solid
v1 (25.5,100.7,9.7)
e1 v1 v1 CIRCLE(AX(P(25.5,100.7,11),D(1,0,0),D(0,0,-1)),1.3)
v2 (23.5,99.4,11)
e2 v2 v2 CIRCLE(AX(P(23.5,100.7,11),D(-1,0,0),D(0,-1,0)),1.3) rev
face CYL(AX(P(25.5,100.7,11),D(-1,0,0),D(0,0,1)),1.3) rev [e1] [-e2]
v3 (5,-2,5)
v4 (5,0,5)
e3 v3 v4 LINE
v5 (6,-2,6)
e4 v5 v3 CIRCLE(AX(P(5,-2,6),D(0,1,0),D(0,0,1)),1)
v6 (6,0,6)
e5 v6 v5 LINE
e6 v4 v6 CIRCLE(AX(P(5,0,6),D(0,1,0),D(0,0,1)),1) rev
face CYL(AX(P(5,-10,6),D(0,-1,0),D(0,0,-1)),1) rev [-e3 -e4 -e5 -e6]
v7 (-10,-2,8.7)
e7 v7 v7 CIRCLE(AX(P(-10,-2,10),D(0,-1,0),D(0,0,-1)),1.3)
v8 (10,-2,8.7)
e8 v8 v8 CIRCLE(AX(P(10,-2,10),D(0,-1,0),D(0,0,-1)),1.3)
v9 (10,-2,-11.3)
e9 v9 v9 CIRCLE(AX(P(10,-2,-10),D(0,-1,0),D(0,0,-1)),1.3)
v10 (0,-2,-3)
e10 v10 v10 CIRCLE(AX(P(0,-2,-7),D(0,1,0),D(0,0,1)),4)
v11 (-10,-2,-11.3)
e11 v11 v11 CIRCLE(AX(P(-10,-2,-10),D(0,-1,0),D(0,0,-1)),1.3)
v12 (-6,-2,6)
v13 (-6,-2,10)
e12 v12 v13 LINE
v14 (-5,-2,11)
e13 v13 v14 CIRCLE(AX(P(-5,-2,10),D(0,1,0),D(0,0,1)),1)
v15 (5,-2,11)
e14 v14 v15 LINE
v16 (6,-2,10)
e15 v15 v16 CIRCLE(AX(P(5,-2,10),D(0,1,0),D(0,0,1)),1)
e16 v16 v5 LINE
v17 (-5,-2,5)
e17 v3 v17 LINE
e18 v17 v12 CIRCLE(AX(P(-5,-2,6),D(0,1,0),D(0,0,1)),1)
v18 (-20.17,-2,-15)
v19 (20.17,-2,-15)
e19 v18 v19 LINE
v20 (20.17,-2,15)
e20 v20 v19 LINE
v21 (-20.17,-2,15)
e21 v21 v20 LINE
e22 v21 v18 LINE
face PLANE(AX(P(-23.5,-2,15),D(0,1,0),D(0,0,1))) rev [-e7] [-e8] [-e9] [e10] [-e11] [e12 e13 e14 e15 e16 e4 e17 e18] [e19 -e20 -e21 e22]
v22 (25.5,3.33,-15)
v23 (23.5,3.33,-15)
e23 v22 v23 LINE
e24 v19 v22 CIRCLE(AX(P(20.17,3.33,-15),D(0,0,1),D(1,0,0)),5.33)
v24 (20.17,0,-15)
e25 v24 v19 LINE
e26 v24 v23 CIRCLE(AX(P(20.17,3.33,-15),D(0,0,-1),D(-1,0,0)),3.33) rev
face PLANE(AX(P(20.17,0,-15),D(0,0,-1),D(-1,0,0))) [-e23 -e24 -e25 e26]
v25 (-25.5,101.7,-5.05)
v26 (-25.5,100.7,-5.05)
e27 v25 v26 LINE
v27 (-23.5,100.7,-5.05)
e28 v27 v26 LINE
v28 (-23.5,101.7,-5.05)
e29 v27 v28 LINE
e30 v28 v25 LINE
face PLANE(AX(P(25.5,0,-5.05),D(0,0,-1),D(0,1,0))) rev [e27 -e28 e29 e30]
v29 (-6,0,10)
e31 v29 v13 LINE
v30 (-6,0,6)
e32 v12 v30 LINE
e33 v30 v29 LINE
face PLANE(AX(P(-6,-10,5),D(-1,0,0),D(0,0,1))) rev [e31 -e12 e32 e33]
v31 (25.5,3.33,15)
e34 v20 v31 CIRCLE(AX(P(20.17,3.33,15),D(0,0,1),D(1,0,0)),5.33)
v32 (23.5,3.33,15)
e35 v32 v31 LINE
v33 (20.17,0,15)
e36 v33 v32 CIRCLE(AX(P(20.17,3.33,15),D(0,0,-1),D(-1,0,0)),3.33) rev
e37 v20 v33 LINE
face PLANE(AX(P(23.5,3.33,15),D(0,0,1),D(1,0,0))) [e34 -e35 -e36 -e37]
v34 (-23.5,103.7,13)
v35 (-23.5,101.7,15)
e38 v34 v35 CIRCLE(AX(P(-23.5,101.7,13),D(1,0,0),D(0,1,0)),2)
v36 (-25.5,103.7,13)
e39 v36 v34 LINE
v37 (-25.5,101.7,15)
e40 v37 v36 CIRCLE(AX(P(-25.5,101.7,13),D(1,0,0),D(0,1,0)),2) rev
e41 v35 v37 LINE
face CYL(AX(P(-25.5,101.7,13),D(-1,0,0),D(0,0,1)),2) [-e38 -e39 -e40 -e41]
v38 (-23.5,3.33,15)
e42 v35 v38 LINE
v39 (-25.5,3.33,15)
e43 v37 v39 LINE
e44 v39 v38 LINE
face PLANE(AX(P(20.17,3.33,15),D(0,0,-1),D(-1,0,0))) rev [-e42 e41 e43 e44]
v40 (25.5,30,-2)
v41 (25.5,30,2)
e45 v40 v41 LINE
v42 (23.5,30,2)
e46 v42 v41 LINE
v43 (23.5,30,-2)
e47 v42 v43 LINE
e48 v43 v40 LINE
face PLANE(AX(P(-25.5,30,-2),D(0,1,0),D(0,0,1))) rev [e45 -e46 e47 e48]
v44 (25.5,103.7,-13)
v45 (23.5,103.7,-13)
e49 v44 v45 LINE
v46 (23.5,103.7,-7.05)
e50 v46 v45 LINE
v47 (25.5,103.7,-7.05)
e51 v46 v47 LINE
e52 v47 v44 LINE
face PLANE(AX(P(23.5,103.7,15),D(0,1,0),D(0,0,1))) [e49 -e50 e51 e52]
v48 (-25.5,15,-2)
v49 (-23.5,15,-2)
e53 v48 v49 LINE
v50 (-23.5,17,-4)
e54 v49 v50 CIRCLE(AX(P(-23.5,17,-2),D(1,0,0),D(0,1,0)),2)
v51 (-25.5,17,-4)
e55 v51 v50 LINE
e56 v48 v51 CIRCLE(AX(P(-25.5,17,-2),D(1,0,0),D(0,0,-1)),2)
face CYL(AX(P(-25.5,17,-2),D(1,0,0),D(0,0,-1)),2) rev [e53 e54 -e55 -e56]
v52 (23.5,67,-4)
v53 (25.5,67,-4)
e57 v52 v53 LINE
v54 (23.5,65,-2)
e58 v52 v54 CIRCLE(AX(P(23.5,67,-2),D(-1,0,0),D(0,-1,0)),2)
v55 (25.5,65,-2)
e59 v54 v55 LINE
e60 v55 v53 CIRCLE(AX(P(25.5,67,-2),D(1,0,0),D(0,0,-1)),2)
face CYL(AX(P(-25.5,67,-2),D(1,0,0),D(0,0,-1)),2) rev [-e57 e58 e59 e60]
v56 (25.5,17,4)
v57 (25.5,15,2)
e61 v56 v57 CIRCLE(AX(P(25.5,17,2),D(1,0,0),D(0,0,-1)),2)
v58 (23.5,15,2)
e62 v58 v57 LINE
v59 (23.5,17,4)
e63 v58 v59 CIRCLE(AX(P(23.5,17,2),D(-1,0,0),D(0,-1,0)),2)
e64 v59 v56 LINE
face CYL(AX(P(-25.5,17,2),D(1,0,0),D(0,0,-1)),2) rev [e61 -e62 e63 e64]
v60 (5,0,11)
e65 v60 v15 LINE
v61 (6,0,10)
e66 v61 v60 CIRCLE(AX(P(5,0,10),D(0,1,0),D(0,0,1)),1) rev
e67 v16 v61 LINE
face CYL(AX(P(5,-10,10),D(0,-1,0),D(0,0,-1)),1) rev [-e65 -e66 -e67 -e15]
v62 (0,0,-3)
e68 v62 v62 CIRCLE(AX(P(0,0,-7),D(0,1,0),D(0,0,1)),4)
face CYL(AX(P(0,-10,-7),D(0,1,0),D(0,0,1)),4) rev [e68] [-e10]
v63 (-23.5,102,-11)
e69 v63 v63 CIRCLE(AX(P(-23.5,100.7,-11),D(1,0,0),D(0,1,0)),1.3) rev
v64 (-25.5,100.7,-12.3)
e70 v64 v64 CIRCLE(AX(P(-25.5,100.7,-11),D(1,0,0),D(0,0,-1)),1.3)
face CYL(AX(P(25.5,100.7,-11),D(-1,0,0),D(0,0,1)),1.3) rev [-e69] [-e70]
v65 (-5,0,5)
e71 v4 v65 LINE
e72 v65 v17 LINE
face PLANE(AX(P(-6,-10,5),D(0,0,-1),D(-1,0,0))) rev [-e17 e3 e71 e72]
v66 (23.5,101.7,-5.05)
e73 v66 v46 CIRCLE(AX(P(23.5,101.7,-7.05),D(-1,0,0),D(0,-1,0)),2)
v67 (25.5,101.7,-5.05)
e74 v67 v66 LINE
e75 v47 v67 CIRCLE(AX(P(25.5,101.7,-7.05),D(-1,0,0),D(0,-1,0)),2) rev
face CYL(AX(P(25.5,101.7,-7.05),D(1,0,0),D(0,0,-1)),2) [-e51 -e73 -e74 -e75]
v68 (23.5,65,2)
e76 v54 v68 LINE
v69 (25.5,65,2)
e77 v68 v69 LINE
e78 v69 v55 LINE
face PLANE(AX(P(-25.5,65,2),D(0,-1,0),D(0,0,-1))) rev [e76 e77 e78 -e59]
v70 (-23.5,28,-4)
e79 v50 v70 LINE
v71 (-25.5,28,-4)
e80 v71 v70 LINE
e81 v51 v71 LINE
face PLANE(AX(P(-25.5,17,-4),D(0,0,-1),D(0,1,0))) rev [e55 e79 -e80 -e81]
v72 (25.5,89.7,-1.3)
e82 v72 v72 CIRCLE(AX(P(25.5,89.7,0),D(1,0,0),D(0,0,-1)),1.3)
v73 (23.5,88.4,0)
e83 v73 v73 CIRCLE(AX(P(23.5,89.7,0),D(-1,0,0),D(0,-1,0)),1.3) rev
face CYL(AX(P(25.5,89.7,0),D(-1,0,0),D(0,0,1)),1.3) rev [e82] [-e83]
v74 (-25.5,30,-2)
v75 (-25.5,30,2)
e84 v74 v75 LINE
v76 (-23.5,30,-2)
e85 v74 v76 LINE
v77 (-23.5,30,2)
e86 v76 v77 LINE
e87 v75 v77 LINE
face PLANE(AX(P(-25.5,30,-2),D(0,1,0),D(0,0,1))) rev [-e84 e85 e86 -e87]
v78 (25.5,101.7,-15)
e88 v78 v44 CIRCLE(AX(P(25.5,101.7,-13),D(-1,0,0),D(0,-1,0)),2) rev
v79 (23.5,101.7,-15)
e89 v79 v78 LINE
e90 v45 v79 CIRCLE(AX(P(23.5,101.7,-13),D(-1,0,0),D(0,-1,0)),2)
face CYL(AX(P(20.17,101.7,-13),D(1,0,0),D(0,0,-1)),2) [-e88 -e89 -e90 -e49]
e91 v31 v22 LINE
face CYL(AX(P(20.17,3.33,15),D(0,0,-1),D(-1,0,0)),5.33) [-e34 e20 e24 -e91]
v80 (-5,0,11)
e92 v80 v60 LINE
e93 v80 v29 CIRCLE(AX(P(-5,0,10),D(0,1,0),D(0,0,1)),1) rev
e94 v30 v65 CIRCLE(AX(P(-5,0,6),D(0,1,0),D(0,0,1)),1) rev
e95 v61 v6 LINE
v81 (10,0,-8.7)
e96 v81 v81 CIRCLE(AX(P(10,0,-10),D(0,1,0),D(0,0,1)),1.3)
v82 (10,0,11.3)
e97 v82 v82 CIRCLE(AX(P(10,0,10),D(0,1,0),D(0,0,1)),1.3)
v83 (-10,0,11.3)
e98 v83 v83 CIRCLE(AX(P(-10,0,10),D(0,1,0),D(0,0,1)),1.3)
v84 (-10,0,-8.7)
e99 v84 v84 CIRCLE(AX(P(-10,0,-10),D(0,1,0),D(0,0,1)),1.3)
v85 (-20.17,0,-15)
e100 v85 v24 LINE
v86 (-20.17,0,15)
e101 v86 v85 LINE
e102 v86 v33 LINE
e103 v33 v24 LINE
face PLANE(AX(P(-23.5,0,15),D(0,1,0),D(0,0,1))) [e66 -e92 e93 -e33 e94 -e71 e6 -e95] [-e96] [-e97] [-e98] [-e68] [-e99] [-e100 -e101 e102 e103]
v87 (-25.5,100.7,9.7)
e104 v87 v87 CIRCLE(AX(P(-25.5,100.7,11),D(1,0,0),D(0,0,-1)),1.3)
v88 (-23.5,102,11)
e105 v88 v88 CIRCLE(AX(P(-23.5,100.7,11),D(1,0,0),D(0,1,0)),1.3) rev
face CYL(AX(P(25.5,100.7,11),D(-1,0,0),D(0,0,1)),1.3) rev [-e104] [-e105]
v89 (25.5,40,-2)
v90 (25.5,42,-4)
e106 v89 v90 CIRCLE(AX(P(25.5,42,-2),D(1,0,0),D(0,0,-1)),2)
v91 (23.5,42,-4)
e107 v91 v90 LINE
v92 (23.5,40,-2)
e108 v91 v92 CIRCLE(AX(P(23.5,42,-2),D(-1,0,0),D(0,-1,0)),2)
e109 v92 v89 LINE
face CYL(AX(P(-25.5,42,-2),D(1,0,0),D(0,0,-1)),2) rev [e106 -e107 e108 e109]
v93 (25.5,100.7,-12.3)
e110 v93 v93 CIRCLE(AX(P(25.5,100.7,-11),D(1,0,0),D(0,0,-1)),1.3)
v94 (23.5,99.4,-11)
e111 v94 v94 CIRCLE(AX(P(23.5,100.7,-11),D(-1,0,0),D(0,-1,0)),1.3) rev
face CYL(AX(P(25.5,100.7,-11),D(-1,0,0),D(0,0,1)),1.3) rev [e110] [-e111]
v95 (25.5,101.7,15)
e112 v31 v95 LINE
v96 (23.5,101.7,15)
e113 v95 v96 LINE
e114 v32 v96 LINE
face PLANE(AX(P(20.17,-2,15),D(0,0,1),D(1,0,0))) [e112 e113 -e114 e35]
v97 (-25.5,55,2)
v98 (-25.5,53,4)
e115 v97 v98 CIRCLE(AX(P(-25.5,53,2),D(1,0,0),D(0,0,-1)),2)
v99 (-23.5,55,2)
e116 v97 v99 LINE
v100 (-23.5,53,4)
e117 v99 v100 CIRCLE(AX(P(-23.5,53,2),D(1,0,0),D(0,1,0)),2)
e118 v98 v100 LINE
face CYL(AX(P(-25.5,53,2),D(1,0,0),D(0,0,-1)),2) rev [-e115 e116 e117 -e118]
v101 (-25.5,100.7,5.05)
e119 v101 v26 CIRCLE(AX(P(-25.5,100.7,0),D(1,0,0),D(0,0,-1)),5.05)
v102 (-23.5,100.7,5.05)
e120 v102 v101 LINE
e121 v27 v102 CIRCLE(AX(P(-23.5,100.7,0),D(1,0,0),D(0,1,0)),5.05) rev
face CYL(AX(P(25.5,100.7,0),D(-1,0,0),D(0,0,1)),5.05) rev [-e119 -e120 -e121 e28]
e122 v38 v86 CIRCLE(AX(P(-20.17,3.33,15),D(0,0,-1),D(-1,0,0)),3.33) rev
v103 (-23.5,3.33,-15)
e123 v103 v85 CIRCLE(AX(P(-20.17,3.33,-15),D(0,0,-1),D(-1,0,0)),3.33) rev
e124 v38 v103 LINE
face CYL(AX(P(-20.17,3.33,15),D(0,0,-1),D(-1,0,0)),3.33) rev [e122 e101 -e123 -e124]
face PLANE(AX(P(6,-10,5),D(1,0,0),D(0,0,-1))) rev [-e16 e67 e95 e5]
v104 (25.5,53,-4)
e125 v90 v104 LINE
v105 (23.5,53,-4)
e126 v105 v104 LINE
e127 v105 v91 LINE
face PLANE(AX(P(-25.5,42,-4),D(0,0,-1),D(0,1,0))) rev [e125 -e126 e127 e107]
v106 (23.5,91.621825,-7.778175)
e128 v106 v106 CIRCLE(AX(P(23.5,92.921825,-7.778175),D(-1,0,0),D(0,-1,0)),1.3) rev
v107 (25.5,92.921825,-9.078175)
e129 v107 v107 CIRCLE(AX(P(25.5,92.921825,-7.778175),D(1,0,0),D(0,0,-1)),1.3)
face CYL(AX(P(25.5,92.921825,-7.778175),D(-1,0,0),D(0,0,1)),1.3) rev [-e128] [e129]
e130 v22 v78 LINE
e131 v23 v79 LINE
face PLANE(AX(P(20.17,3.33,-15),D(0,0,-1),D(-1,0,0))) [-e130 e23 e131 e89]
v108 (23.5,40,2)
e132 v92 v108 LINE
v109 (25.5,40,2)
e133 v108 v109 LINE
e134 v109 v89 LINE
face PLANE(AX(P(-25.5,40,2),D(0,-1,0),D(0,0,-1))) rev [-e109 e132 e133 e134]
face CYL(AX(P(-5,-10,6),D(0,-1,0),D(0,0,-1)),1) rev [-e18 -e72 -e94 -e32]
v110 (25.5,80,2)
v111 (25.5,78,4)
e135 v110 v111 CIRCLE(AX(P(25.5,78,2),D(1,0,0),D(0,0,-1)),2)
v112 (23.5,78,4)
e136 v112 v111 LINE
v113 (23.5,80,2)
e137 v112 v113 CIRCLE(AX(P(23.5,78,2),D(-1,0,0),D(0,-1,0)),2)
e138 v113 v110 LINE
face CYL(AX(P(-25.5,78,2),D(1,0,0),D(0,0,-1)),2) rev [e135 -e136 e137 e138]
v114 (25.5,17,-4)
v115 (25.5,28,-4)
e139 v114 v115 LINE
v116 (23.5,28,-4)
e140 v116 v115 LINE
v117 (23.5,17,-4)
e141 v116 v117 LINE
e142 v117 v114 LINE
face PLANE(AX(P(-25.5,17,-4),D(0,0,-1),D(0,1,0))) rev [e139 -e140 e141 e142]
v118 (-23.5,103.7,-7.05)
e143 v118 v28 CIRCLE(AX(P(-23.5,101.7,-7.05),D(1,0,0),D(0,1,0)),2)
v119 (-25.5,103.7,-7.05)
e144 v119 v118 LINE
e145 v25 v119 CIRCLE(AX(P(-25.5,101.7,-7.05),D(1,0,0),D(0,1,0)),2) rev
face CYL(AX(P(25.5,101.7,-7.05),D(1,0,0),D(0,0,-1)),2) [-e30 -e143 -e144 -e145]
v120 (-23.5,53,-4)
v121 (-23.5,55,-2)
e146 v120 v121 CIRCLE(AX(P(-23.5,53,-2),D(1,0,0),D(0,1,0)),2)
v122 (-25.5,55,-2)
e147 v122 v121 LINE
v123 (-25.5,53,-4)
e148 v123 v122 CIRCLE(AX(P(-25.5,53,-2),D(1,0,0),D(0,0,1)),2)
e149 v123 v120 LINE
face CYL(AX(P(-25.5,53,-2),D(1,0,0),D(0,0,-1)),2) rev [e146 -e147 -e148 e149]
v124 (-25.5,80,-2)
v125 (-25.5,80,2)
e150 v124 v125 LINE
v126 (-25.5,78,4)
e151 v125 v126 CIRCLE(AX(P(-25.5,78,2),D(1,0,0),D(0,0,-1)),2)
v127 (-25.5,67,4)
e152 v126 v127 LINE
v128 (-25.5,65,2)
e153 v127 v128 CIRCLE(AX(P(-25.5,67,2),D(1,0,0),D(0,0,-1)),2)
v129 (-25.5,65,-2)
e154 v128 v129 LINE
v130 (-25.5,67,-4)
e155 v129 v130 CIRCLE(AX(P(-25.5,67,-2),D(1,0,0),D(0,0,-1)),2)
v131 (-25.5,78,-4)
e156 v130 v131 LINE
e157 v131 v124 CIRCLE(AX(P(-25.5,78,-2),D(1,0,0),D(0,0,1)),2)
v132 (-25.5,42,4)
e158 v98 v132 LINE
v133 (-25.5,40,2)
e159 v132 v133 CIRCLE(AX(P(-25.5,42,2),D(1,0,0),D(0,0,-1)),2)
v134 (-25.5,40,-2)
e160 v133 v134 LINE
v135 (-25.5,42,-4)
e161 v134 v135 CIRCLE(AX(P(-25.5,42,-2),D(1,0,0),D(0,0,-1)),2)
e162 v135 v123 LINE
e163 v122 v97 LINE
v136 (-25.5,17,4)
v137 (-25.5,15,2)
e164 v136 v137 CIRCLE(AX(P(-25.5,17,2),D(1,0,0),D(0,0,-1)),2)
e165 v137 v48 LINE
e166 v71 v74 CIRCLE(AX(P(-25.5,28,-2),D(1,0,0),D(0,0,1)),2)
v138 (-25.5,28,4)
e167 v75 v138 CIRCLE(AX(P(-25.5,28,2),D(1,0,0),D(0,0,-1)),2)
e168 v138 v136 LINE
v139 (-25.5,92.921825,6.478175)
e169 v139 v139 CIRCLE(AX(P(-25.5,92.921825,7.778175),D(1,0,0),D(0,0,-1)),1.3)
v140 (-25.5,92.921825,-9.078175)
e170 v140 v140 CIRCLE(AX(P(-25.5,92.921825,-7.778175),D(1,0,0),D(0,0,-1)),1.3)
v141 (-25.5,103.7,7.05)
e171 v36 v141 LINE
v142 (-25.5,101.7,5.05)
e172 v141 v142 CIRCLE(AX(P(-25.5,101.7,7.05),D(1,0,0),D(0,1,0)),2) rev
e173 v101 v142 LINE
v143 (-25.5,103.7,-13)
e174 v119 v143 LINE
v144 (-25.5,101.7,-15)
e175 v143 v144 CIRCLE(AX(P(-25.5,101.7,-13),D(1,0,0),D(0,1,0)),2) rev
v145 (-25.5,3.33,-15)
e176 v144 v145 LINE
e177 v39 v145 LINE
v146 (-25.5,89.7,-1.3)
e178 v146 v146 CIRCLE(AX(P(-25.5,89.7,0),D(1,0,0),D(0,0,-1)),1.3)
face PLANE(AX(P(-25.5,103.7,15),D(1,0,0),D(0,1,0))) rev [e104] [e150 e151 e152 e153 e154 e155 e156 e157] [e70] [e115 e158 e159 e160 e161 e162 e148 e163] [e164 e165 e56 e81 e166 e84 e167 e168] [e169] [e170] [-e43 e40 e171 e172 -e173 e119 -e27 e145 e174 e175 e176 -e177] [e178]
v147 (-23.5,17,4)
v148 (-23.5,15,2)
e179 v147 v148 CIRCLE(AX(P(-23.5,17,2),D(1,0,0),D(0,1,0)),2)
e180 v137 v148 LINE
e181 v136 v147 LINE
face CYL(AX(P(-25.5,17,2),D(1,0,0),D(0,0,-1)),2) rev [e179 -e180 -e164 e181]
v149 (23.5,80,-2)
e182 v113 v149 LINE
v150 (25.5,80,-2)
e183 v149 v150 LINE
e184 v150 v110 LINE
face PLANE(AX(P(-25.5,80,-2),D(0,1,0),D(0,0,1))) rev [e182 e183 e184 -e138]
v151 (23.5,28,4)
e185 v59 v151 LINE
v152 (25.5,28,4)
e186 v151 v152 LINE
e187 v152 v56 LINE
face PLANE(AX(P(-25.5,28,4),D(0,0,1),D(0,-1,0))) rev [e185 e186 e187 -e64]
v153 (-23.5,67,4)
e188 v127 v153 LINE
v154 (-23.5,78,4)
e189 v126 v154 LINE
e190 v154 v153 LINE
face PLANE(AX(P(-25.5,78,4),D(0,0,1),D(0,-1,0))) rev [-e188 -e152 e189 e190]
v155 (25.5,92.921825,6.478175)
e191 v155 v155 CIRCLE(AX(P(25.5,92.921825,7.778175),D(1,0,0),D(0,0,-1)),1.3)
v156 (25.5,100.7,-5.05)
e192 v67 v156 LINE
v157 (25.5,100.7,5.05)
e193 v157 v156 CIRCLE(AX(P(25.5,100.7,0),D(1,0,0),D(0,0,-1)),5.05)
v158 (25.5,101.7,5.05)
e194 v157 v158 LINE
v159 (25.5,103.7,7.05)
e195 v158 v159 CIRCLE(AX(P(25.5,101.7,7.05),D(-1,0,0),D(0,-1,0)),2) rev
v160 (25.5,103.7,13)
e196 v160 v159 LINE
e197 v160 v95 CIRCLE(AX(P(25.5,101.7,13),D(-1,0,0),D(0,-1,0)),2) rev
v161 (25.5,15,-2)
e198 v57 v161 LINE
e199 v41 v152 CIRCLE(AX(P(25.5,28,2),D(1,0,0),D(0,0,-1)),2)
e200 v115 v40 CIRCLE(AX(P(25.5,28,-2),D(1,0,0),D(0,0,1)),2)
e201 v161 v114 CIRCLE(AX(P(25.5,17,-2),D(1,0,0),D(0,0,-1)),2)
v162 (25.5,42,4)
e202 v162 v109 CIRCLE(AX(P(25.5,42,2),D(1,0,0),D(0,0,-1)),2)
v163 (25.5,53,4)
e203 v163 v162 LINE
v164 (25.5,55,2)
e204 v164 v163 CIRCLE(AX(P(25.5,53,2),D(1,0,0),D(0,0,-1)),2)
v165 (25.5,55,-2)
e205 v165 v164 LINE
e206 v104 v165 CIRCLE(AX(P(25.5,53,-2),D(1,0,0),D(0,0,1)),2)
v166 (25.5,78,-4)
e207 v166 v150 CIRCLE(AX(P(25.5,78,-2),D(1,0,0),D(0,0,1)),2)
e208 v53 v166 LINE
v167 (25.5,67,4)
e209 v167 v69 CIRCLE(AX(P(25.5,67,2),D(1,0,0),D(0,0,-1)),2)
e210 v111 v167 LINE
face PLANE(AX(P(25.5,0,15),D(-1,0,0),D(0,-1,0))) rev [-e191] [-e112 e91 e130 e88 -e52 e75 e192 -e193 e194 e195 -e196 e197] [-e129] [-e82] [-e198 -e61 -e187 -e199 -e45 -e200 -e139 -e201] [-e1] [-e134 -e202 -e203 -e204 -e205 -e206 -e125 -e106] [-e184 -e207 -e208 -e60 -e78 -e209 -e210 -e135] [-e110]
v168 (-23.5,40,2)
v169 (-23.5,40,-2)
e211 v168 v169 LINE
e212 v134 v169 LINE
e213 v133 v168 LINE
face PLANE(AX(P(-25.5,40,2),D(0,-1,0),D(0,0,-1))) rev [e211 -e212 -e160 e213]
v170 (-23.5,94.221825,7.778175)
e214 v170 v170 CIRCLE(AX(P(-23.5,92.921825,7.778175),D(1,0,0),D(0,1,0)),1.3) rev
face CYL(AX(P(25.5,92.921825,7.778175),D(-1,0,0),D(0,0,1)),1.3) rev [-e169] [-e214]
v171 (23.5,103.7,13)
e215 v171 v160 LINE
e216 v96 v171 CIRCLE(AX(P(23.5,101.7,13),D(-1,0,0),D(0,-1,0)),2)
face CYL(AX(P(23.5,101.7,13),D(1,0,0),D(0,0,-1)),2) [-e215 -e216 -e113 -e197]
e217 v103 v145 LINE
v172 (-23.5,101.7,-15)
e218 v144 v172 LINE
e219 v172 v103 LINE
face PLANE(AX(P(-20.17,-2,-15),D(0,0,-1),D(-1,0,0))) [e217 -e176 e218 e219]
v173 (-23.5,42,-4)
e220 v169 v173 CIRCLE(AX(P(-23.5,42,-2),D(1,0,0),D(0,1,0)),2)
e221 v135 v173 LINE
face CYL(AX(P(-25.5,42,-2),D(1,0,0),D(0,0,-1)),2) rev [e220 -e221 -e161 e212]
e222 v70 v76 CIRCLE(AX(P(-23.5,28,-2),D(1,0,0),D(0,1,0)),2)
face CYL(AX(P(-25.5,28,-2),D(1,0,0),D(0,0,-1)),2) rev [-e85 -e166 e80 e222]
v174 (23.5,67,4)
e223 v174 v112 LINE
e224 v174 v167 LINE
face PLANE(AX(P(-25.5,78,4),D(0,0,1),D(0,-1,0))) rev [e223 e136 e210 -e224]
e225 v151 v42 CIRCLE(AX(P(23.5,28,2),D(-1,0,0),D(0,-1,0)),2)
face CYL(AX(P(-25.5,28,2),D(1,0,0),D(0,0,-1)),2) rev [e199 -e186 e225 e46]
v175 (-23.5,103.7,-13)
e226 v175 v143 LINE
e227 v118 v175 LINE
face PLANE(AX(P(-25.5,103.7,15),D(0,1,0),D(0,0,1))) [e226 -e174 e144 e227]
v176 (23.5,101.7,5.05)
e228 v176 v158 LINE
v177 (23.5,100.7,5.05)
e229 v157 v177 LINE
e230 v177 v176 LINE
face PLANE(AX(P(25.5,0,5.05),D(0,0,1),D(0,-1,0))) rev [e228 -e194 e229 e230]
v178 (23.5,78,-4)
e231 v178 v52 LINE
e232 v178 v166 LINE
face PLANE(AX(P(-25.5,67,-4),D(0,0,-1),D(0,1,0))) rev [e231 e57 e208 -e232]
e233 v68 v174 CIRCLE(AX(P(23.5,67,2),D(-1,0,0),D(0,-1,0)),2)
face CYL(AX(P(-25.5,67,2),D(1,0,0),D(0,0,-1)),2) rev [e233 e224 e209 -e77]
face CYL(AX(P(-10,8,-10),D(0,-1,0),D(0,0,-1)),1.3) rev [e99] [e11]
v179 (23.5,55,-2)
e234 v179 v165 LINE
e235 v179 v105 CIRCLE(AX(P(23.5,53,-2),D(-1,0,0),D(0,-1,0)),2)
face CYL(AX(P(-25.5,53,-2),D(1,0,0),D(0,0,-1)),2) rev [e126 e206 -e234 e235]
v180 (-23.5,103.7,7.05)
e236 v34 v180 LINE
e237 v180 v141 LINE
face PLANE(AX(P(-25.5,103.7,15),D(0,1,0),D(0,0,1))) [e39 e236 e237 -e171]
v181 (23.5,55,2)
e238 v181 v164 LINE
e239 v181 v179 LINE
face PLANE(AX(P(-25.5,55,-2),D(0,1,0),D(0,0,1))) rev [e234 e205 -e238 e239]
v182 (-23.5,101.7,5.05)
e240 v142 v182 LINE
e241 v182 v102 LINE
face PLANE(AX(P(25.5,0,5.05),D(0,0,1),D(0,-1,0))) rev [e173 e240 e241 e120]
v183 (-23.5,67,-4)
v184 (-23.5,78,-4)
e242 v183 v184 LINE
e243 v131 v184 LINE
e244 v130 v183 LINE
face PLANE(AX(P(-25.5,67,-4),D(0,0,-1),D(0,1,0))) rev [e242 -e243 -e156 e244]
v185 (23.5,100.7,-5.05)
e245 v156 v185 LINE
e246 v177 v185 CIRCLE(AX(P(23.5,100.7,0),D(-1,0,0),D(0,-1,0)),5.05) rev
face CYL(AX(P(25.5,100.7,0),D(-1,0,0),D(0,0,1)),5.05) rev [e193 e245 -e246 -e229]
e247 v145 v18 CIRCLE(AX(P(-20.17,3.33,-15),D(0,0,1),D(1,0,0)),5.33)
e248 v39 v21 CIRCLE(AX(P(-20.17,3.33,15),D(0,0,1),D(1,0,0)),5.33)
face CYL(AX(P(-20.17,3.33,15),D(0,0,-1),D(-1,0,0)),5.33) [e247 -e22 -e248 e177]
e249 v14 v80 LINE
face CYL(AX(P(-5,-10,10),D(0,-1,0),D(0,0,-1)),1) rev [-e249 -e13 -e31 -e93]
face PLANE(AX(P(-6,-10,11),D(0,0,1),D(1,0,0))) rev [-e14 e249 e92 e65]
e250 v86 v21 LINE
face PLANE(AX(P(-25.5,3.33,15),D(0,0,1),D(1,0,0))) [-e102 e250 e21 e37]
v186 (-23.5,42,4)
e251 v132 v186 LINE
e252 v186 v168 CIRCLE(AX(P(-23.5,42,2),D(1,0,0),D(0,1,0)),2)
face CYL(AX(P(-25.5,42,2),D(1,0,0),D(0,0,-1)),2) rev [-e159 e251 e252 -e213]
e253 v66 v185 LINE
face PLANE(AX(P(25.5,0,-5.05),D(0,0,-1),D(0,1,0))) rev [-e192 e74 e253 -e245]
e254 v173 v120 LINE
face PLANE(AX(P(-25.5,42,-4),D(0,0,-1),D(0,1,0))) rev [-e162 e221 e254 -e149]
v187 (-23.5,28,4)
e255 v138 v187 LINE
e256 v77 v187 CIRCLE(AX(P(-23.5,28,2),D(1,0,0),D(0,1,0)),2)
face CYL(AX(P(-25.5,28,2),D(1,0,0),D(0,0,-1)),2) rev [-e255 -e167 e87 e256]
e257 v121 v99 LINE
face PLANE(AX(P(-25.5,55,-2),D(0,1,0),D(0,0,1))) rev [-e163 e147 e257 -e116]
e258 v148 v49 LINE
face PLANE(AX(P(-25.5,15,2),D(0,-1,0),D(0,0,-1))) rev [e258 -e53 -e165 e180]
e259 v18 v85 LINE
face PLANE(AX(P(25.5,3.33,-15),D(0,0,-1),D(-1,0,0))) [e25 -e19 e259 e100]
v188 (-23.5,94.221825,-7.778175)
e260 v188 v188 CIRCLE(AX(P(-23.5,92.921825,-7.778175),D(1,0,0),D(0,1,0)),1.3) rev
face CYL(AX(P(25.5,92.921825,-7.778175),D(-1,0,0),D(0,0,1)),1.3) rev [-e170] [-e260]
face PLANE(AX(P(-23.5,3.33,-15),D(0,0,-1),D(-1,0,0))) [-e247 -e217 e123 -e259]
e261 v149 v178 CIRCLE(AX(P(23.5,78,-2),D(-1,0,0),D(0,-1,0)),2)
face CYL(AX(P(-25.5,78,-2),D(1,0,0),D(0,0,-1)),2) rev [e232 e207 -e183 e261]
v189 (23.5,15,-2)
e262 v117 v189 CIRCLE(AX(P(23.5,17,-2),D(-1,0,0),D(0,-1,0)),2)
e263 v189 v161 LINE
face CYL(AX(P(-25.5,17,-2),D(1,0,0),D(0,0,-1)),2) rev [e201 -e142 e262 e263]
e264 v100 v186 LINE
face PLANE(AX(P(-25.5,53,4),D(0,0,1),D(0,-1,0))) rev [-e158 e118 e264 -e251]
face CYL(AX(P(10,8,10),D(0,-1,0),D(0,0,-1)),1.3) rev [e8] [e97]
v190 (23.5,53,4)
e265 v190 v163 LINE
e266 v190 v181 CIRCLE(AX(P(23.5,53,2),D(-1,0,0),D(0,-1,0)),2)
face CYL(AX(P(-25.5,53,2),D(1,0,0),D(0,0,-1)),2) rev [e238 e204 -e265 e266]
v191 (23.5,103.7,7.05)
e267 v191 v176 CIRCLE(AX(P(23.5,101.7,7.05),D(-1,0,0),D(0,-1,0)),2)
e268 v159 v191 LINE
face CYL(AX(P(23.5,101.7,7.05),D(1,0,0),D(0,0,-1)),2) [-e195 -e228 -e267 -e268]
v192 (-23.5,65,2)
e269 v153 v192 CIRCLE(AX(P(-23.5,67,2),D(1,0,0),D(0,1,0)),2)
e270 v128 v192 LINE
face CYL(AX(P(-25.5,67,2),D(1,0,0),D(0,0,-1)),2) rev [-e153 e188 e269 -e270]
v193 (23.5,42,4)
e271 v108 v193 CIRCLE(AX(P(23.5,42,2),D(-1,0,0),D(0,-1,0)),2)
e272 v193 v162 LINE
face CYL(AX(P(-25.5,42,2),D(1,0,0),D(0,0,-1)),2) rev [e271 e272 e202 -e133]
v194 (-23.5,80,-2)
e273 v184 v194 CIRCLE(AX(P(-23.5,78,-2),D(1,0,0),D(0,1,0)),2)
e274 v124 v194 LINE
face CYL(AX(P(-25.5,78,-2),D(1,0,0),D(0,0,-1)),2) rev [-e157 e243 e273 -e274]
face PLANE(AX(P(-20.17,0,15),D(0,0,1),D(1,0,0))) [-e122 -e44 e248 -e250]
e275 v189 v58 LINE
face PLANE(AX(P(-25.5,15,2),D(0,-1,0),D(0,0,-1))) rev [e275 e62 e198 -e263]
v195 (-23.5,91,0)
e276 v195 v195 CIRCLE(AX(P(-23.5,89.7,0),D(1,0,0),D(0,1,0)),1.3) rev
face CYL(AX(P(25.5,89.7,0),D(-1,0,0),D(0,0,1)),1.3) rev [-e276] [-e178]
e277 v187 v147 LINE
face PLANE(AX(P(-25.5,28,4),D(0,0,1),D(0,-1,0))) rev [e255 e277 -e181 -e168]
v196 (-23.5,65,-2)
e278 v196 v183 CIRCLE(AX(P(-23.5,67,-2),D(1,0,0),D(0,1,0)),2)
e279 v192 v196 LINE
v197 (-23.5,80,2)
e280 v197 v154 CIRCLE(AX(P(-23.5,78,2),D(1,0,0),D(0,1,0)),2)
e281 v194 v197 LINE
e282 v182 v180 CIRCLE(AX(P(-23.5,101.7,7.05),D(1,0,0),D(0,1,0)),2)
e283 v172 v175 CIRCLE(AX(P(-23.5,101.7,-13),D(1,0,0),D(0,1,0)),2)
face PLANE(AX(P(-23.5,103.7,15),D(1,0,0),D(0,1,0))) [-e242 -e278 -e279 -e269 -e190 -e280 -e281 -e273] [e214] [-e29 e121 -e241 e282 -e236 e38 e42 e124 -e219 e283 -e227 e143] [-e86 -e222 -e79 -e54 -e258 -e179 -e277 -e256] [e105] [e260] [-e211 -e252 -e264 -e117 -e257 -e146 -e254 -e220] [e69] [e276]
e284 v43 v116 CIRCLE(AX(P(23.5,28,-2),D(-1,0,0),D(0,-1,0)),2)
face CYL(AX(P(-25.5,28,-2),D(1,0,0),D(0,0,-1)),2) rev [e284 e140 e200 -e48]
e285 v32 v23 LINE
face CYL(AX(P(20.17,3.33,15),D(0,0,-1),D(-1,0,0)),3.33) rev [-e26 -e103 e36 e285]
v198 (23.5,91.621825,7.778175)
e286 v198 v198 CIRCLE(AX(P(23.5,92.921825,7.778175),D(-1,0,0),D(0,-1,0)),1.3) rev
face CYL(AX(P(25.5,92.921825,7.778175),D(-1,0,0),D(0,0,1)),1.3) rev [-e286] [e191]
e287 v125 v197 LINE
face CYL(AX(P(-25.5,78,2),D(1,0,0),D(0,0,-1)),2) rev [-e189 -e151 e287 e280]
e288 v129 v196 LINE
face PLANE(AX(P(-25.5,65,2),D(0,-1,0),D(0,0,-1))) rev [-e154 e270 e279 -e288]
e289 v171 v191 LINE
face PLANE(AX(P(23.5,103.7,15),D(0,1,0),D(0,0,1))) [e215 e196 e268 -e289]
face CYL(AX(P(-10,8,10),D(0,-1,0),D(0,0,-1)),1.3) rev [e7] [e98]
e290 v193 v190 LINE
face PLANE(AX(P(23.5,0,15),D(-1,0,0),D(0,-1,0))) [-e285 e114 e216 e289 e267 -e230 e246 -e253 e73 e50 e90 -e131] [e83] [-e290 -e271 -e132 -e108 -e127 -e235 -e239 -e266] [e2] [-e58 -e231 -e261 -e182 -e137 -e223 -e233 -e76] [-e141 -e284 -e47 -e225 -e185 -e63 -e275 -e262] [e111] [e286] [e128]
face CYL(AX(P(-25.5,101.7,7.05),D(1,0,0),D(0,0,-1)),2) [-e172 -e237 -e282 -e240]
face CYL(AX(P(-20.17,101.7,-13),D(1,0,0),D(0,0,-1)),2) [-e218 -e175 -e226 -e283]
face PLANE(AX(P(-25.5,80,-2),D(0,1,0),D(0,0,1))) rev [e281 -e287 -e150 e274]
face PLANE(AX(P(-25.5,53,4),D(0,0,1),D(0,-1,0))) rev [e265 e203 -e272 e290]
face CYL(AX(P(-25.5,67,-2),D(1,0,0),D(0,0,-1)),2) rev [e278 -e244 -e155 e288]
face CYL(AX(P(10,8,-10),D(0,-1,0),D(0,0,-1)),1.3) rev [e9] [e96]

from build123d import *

# Parameters (mm, degrees)
BASE_FLANGE1_DEPTH      = 15
CUT_EXTRUDE1_DEPTH      = 10
CUT_EXTRUDE2_DEPTH      = 108.837563029
CUT_EXTRUDE2_DEPTH_BACK = 108.837563029
SKETCH6_R               = 1.3
SKETCH8_R               = 4
SKETCH8_W               = 12
SKETCH8_H               = 6
CUT_EXTRUDE4_DEPTH      = 10
CUT_EXTRUDE5_DEPTH      = 108.837563029
CUT_EXTRUDE5_DEPTH_BACK = 108.837563029
FILLET1_R               = 2
FILLET2_R               = 1


# Sheet-metal steps are written as plain solids
with BuildPart() as part:
    # Sketch1 → Base-Flange1 (new, symmetric)
    with BuildSketch(Plane.XY):
        with BuildLine():
            Line((-23.5, 103.7), (-23.5, 3.33))
            ThreePointArc((-23.5, 3.33), (-22.524665581, 0.975334419), (-20.17, 0))
            Line((-20.17, 0), (20.17, 0))
            ThreePointArc((20.17, 0), (22.524665581, 0.975334419), (23.5, 3.33))
            Line((23.5, 3.33), (23.5, 103.7))
            Line((23.5, 103.7), (25.5, 103.7))
            Line((25.5, 103.7), (25.5, 3.33))
            ThreePointArc((25.5, 3.33), (23.938879144, -0.438879144), (20.17, -2))
            Line((20.17, -2), (-20.17, -2))
            ThreePointArc((-20.17, -2), (-23.938879144, -0.438879144), (-25.5, 3.33))
            Line((-25.5, 3.33), (-25.5, 103.7))
            Line((-25.5, 103.7), (-23.5, 103.7))
        make_face()
    extrude(amount=BASE_FLANGE1_DEPTH, both=True)

    # Sketch5 → Cut-Extrude1 (cut)
    with BuildSketch(Plane.XZ.offset(2)):
        with BuildLine():
            Line((-10, 8.7), (-10, 10))
            Line((-10, 10), (-8.7, 10))
            ThreePointArc((-8.7, 10), (-10.919238816, 10.919238816), (-10, 8.7))
        make_face()
        with BuildLine():
            Line((-8.7, 10), (-10, 10))
            Line((-10, 10), (-10, 8.7))
            ThreePointArc((-10, 8.7), (-9.080761184, 9.080761184), (-8.7, 10))
        make_face()
        with BuildLine():
            ThreePointArc((11.3, 10), (10, 11.3), (8.7, 10))
            Line((8.7, 10), (10, 10))
            Line((10, 10), (10, 8.7))
            ThreePointArc((10, 8.7), (10.919238816, 9.080761184), (11.3, 10))
        make_face()
        with BuildLine():
            Line((10, 10), (8.7, 10))
            ThreePointArc((8.7, 10), (9.080761184, 9.080761184), (10, 8.7))
            Line((10, 8.7), (10, 10))
        make_face()
        with BuildLine():
            ThreePointArc((11.3, -10), (10.919238816, -9.080761184), (10, -8.7))
            Line((10, -8.7), (10, -10))
            Line((10, -10), (8.7, -10))
            ThreePointArc((8.7, -10), (10, -11.3), (11.3, -10))
        make_face()
        with BuildLine():
            Line((10, -10), (10, -8.7))
            ThreePointArc((10, -8.7), (9.080761184, -9.080761184), (8.7, -10))
            Line((8.7, -10), (10, -10))
        make_face()
        with BuildLine():
            ThreePointArc((-8.7, -10), (-9.080761184, -9.080761184), (-10, -8.7))
            Line((-10, -8.7), (-10, -10))
            Line((-10, -10), (-8.7, -10))
        make_face()
        with BuildLine():
            Line((-10, -10), (-10, -8.7))
            ThreePointArc((-10, -8.7), (-10.919238816, -10.919238816), (-8.7, -10))
            Line((-8.7, -10), (-10, -10))
        make_face()
    extrude(amount=-CUT_EXTRUDE1_DEPTH, mode=Mode.SUBTRACT)

    # Sketch6 → Cut-Extrude2 (cut, two sides: drawn at the far end of the back side and taken through both)
    with BuildSketch(Plane(origin=(0, 0, 0), x_dir=(0, 0, -1), z_dir=(1, 0, 0)).offset(-CUT_EXTRUDE2_DEPTH_BACK)):
        with BuildLine():
            ThreePointArc((-4.062326919, 103.7), (-4.796730707, 102.279200598), (-5.05, 100.7))
            ThreePointArc((-5.05, 100.7), (0, 95.65), (5.05, 100.7))
            ThreePointArc((5.05, 100.7), (4.796730707, 102.279200598), (4.062326919, 103.7))
            Line((4.062326919, 103.7), (-4.062326919, 103.7))
        make_face()
        with BuildLine():
            ThreePointArc((4.062326919, 103.7), (0, 105.75), (-4.062326919, 103.7))
            Line((-4.062326919, 103.7), (4.062326919, 103.7))
        make_face()
        with BuildLine():
            Line((-5.05, 103.7), (-5.05, 100.7))
            ThreePointArc((-5.05, 100.7), (-4.796730707, 102.279200598), (-4.062326919, 103.7))
            Line((-4.062326919, 103.7), (-5.05, 103.7))
        make_face()
        with BuildLine():
            ThreePointArc((4.062326919, 103.7), (4.796730707, 102.279200598), (5.05, 100.7))
            Line((5.05, 100.7), (5.05, 103.7))
            Line((5.05, 103.7), (4.062326919, 103.7))
        make_face()
        with Locations(Location((11, 100.7, 0), (0, 0, 90))):
            Circle(SKETCH6_R)
        with Locations(Location((0, 89.7, 0), (0, 0, 90))):
            Circle(SKETCH6_R)
        with Locations(Location((-7.778174593, 92.921825407, 0), (0, 0, 90))):
            Circle(SKETCH6_R)
        with Locations(Location((7.778174593, 92.921825407, 0), (0, 0, 90))):
            Circle(SKETCH6_R)
        with Locations(Location((-11, 100.7, 0), (0, 0, 90))):
            Circle(SKETCH6_R)
    extrude(amount=CUT_EXTRUDE2_DEPTH + CUT_EXTRUDE2_DEPTH_BACK, mode=Mode.SUBTRACT)

    # Sketch8 → Cut-Extrude4 (cut)
    with BuildSketch(Plane(origin=(0, 0, 0), x_dir=(1, 0, 0), z_dir=(0, 1, 0))):
        with Locations(Location((0, 7, 0), (0, 0, 270))):
            Circle(SKETCH8_R)
        with Locations((0, -8)):
            Rectangle(SKETCH8_W, SKETCH8_H)
    extrude(amount=-CUT_EXTRUDE4_DEPTH, mode=Mode.SUBTRACT)

    # Sketch9 → Cut-Extrude5 (cut, two sides: drawn at the far end of the back side and taken through both)
    with BuildSketch(Plane(origin=(0, 0, 0), x_dir=(0, 0, -1), z_dir=(1, 0, 0)).offset(-CUT_EXTRUDE5_DEPTH_BACK)):
        with BuildLine():
            Line((-2, 40), (2, 40))
            ThreePointArc((2, 40), (3.414213562, 40.585786438), (4, 42))
            Line((4, 42), (4, 53))
            ThreePointArc((4, 53), (3.414213562, 54.414213562), (2, 55))
            Line((2, 55), (-2, 55))
            ThreePointArc((-2, 55), (-3.414213562, 54.414213562), (-4, 53))
            Line((-4, 53), (-4, 42))
            ThreePointArc((-4, 42), (-3.414213562, 40.585786438), (-2, 40))
        make_face()
        with BuildLine():
            Line((-2, 15), (2, 15))
            ThreePointArc((2, 15), (3.414213562, 15.585786438), (4, 17))
            Line((4, 17), (4, 28))
            ThreePointArc((4, 28), (3.414213562, 29.414213562), (2, 30))
            Line((2, 30), (-2, 30))
            ThreePointArc((-2, 30), (-3.414213562, 29.414213562), (-4, 28))
            Line((-4, 28), (-4, 17))
            ThreePointArc((-4, 17), (-3.414213562, 15.585786438), (-2, 15))
        make_face()
        with BuildLine():
            Line((-2, 65), (2, 65))
            ThreePointArc((2, 65), (3.414213562, 65.585786438), (4, 67))
            Line((4, 67), (4, 78))
            ThreePointArc((4, 78), (3.414213562, 79.414213562), (2, 80))
            Line((2, 80), (-2, 80))
            ThreePointArc((-2, 80), (-3.414213562, 79.414213562), (-4, 78))
            Line((-4, 78), (-4, 67))
            ThreePointArc((-4, 67), (-3.414213562, 65.585786438), (-2, 65))
        make_face()
    extrude(amount=CUT_EXTRUDE5_DEPTH + CUT_EXTRUDE5_DEPTH_BACK, mode=Mode.SUBTRACT)

    # Fillet1
    fillet1_edges = [part.edges().sort_by_distance(p)[0] for p in [
        (-24.5, 103.7, -15),
        (24.5, 103.7, -15),
        (-24.5, 103.7, 15),
        (24.5, 103.7, 15),
        (24.5, 103.7, -5.05),
        (24.5, 103.7, 5.05),
        (-24.5, 103.7, -5.05),
        (-24.5, 103.7, 5.05),
    ]]
    fillet(fillet1_edges, radius=FILLET1_R)

    # Fillet2
    fillet2_edges = [part.edges().sort_by_distance(p)[0] for p in [
        (-6, -1, 11),
        (-6, -1, 5),
        (6, -1, 5),
        (6, -1, 11),
    ]]
    fillet(fillet2_edges, radius=FILLET2_R)


solid = part.part
